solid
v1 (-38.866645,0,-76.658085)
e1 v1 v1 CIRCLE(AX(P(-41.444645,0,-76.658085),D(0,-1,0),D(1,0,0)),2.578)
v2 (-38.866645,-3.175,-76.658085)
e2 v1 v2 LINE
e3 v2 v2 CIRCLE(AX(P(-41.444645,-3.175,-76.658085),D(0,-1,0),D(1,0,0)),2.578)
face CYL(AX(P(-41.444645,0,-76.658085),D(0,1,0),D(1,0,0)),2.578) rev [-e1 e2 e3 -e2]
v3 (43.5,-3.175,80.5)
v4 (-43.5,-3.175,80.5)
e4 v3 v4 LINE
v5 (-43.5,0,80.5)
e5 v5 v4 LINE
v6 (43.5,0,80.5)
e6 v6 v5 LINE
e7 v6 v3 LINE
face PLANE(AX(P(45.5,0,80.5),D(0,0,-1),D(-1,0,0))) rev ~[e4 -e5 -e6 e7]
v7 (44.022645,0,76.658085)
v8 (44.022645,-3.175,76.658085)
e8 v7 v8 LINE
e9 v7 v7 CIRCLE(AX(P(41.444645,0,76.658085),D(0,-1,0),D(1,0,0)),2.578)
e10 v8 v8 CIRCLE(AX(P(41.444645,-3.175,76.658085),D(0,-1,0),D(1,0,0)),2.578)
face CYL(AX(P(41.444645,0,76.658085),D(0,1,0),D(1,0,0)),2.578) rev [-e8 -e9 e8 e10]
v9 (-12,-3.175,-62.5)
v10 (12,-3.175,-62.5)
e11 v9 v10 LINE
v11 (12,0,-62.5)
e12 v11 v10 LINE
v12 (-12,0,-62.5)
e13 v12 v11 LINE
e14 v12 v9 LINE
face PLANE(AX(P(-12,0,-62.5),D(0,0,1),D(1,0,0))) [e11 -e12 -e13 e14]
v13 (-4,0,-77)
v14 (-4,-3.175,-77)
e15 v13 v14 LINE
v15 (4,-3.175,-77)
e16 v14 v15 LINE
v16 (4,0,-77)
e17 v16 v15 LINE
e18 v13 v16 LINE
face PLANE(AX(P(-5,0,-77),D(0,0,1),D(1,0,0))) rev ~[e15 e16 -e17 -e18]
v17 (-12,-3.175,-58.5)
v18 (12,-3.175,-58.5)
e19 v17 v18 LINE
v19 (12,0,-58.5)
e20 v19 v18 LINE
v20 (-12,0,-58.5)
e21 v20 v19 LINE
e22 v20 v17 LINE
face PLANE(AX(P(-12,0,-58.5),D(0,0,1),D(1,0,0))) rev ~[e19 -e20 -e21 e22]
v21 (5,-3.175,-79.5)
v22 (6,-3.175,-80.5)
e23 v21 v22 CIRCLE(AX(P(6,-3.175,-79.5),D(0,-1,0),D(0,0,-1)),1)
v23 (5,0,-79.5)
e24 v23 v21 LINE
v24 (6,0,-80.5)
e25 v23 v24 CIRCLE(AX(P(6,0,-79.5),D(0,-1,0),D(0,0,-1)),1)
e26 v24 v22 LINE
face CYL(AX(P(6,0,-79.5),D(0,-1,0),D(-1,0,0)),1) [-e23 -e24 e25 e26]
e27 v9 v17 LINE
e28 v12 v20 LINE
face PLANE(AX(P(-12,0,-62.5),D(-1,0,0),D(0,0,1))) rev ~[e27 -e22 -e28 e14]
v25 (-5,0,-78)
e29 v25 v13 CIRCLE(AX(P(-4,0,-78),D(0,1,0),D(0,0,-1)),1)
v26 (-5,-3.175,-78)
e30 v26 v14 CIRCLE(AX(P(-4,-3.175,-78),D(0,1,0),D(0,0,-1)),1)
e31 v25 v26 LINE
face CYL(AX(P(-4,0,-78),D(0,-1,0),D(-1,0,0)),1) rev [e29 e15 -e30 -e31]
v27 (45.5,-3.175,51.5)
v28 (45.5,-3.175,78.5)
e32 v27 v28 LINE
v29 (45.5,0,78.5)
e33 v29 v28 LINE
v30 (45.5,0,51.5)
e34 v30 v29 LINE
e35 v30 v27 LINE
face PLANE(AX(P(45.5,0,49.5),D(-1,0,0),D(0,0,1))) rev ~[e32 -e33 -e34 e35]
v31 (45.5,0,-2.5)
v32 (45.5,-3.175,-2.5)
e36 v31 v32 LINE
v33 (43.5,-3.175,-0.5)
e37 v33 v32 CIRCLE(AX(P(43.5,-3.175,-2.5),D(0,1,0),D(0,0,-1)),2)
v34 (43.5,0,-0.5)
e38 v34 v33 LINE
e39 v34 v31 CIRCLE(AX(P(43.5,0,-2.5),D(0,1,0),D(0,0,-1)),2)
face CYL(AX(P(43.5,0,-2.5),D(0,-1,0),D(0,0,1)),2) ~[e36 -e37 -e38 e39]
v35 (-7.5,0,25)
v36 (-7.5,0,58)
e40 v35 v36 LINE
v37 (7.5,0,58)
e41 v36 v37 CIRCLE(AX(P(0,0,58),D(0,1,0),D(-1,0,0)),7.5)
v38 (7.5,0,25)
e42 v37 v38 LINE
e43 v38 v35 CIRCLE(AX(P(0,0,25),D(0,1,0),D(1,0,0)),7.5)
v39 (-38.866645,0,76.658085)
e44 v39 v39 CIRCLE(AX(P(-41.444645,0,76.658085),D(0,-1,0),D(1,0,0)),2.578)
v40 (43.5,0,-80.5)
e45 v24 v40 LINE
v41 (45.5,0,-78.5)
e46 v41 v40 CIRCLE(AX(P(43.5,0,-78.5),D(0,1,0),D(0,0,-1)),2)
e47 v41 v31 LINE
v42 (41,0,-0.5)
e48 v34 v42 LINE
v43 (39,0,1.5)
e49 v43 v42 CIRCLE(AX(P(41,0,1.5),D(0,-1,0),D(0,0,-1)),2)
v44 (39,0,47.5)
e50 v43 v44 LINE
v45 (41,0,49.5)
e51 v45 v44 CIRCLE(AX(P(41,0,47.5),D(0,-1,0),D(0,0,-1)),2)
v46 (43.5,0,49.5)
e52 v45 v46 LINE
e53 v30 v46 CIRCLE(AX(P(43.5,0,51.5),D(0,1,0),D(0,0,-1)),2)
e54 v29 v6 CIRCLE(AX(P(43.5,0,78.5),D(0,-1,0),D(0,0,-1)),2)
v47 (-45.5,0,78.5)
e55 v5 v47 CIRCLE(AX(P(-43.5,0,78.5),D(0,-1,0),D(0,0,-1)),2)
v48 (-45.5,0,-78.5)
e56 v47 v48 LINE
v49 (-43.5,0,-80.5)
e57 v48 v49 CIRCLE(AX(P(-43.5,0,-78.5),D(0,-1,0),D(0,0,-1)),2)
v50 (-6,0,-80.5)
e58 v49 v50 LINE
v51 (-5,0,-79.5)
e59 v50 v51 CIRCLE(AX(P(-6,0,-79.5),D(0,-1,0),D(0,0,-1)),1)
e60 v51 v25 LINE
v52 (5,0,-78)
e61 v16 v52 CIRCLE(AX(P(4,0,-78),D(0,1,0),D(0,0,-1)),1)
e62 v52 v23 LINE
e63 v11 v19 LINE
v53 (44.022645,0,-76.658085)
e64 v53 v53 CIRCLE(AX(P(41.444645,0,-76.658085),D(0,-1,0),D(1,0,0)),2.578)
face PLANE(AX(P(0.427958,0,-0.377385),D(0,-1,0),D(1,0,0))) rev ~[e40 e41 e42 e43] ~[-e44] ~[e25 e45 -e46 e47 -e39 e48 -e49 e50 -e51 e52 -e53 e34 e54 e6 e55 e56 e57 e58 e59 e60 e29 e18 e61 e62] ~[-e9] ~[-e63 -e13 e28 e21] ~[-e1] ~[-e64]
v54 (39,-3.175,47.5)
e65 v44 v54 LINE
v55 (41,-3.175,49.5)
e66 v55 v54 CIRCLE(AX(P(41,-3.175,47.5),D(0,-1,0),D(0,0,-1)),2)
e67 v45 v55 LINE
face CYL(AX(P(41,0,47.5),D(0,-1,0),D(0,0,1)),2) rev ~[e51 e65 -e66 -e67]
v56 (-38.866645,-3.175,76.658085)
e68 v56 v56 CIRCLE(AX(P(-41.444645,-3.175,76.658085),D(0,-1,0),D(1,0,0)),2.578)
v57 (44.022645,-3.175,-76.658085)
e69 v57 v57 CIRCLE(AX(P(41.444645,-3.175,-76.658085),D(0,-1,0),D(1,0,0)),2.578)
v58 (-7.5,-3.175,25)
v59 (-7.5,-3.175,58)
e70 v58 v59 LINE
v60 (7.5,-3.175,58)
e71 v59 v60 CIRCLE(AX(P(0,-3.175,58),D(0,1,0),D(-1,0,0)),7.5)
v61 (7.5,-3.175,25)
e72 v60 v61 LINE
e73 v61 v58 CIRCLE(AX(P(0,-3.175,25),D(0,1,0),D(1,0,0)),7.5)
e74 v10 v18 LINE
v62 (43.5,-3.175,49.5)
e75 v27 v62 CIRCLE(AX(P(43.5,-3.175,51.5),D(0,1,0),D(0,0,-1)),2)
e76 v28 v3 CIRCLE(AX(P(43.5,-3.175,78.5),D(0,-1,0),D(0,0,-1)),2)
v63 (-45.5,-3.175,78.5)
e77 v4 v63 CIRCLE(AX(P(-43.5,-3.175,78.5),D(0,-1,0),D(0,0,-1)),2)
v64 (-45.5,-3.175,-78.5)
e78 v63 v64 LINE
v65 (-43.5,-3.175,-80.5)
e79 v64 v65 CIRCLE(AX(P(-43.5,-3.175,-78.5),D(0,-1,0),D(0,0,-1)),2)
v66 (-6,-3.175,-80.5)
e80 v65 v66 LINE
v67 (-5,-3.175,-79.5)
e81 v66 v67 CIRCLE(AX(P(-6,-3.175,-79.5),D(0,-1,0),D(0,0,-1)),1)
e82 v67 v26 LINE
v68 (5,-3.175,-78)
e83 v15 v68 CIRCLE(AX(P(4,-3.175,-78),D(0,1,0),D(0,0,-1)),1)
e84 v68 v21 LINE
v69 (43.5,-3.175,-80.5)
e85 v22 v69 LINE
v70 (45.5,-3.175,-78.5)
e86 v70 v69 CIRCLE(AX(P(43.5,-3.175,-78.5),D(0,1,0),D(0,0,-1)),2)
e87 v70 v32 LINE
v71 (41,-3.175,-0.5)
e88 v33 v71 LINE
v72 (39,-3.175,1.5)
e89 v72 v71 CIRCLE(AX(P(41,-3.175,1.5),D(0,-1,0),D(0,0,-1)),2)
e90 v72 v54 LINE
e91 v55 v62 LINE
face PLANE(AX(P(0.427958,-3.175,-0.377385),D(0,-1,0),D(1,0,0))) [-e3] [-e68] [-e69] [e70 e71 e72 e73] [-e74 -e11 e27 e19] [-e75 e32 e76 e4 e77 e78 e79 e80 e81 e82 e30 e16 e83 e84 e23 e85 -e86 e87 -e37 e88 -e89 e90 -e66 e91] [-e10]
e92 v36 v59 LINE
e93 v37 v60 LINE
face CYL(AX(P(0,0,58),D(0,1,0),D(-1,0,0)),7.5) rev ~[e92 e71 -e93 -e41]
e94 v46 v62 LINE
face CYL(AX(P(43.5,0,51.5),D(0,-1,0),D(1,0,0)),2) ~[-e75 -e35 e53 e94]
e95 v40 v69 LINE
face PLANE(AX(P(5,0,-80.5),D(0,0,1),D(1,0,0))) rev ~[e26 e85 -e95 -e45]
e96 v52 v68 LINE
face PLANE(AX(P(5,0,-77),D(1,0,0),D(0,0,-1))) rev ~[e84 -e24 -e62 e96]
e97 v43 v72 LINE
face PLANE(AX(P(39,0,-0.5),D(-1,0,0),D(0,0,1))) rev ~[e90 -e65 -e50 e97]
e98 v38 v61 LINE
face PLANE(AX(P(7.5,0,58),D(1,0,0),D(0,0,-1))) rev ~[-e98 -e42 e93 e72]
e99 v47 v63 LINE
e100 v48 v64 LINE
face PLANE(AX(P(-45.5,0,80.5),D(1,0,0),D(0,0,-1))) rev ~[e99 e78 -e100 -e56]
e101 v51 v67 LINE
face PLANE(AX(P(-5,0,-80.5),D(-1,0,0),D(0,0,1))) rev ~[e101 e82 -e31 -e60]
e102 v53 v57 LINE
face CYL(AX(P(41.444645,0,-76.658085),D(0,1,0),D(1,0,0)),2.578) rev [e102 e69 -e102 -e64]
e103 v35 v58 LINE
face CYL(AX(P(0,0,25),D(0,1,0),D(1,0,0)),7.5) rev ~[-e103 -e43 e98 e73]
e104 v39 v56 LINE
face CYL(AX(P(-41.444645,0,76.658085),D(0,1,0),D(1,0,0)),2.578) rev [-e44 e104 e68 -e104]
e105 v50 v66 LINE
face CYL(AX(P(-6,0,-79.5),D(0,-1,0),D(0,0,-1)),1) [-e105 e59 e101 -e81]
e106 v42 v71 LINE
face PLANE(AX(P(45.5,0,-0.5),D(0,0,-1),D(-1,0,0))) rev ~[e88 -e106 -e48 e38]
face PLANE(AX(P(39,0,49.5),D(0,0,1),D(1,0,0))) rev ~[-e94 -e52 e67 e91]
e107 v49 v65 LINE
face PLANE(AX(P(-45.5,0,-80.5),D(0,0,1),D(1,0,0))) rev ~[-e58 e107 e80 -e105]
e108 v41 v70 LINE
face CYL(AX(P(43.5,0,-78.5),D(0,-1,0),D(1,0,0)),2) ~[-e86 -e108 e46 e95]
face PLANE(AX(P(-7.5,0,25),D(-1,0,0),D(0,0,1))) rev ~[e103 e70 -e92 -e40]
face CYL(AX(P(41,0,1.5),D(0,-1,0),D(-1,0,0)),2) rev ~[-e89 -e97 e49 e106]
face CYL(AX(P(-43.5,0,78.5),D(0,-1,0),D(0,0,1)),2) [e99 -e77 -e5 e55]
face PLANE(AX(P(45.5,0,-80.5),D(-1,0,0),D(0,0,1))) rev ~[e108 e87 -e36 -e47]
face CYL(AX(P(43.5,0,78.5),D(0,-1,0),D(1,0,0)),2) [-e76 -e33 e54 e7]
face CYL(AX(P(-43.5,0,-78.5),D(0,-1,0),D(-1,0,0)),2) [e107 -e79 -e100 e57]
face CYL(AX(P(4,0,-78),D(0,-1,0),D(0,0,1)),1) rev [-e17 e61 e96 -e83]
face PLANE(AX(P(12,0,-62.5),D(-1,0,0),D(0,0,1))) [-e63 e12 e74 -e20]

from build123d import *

# Parameters (mm, degrees)
F1_R     = 2.578
F1_W     = 24
F1_H     = 4
F2_DEPTH = 3.175
F3_R     = 2
F4_R     = 1


# Not quite as in the source:
# - a feature names something its author has since deleted; it is built from what else it names


with BuildPart() as f2:
    # F1 (on Front) → F2 (new body)
    with BuildSketch(Plane.XZ):
        Polygon((45.5, 49.5), (45.5, 80.5), (-45.5, 80.5), (-45.5, -80.5), (-5, -80.5), (-5, -77), (5, -77), (5, -80.5), (45.5, -80.5), (45.5, -0.5), (39, -0.5), (39, 49.5), align=None)
        with Locations((-41.4446451293, -76.6580848593)):
            Circle(F1_R, mode=Mode.SUBTRACT)
        with Locations((0, -60.5)):
            Rectangle(F1_W, F1_H, mode=Mode.SUBTRACT)
        with Locations((41.4446451293, -76.6580848593)):
            Circle(F1_R, mode=Mode.SUBTRACT)
        with Locations((-41.4446451293, 76.6580848593)):
            Circle(F1_R, mode=Mode.SUBTRACT)
        with BuildLine():
            ThreePointArc((-7.5, 58), (0, 65.5), (7.5, 58))
            Line((7.5, 58), (7.5, 25))
            ThreePointArc((7.5, 25), (0, 17.5), (-7.5, 25))
            Line((-7.5, 25), (-7.5, 58))
        make_face(mode=Mode.SUBTRACT)
        with Locations((41.4446451293, 76.6580848593)):
            Circle(F1_R, mode=Mode.SUBTRACT)
    extrude(amount=F2_DEPTH)

    # F3
    f3_edges = [f2.edges().sort_by_distance(p)[0] for p in [
        (-45.5, -1.5875, 80.5),
        (45.5, -1.5875, 80.5),
        (45.5, -1.5875, 49.5),
        (39, -1.5875, 49.5),
        (45.5, -1.5875, -0.5),
        (39, -1.5875, -0.5),
        (-45.5, -1.5875, -80.5),
        (45.5, -1.5875, -80.5),
    ]]
    fillet(f3_edges, radius=F3_R)

    # F4
    f4_edges = [f2.edges().sort_by_distance(p)[0] for p in [
        (5, -1.5875, -80.5),
        (5, -1.5875, -77),
        (-5, -1.5875, -77),
        (-5, -1.5875, -80.5),
    ]]
    fillet(f4_edges, radius=F4_R)


solid = f2.part
